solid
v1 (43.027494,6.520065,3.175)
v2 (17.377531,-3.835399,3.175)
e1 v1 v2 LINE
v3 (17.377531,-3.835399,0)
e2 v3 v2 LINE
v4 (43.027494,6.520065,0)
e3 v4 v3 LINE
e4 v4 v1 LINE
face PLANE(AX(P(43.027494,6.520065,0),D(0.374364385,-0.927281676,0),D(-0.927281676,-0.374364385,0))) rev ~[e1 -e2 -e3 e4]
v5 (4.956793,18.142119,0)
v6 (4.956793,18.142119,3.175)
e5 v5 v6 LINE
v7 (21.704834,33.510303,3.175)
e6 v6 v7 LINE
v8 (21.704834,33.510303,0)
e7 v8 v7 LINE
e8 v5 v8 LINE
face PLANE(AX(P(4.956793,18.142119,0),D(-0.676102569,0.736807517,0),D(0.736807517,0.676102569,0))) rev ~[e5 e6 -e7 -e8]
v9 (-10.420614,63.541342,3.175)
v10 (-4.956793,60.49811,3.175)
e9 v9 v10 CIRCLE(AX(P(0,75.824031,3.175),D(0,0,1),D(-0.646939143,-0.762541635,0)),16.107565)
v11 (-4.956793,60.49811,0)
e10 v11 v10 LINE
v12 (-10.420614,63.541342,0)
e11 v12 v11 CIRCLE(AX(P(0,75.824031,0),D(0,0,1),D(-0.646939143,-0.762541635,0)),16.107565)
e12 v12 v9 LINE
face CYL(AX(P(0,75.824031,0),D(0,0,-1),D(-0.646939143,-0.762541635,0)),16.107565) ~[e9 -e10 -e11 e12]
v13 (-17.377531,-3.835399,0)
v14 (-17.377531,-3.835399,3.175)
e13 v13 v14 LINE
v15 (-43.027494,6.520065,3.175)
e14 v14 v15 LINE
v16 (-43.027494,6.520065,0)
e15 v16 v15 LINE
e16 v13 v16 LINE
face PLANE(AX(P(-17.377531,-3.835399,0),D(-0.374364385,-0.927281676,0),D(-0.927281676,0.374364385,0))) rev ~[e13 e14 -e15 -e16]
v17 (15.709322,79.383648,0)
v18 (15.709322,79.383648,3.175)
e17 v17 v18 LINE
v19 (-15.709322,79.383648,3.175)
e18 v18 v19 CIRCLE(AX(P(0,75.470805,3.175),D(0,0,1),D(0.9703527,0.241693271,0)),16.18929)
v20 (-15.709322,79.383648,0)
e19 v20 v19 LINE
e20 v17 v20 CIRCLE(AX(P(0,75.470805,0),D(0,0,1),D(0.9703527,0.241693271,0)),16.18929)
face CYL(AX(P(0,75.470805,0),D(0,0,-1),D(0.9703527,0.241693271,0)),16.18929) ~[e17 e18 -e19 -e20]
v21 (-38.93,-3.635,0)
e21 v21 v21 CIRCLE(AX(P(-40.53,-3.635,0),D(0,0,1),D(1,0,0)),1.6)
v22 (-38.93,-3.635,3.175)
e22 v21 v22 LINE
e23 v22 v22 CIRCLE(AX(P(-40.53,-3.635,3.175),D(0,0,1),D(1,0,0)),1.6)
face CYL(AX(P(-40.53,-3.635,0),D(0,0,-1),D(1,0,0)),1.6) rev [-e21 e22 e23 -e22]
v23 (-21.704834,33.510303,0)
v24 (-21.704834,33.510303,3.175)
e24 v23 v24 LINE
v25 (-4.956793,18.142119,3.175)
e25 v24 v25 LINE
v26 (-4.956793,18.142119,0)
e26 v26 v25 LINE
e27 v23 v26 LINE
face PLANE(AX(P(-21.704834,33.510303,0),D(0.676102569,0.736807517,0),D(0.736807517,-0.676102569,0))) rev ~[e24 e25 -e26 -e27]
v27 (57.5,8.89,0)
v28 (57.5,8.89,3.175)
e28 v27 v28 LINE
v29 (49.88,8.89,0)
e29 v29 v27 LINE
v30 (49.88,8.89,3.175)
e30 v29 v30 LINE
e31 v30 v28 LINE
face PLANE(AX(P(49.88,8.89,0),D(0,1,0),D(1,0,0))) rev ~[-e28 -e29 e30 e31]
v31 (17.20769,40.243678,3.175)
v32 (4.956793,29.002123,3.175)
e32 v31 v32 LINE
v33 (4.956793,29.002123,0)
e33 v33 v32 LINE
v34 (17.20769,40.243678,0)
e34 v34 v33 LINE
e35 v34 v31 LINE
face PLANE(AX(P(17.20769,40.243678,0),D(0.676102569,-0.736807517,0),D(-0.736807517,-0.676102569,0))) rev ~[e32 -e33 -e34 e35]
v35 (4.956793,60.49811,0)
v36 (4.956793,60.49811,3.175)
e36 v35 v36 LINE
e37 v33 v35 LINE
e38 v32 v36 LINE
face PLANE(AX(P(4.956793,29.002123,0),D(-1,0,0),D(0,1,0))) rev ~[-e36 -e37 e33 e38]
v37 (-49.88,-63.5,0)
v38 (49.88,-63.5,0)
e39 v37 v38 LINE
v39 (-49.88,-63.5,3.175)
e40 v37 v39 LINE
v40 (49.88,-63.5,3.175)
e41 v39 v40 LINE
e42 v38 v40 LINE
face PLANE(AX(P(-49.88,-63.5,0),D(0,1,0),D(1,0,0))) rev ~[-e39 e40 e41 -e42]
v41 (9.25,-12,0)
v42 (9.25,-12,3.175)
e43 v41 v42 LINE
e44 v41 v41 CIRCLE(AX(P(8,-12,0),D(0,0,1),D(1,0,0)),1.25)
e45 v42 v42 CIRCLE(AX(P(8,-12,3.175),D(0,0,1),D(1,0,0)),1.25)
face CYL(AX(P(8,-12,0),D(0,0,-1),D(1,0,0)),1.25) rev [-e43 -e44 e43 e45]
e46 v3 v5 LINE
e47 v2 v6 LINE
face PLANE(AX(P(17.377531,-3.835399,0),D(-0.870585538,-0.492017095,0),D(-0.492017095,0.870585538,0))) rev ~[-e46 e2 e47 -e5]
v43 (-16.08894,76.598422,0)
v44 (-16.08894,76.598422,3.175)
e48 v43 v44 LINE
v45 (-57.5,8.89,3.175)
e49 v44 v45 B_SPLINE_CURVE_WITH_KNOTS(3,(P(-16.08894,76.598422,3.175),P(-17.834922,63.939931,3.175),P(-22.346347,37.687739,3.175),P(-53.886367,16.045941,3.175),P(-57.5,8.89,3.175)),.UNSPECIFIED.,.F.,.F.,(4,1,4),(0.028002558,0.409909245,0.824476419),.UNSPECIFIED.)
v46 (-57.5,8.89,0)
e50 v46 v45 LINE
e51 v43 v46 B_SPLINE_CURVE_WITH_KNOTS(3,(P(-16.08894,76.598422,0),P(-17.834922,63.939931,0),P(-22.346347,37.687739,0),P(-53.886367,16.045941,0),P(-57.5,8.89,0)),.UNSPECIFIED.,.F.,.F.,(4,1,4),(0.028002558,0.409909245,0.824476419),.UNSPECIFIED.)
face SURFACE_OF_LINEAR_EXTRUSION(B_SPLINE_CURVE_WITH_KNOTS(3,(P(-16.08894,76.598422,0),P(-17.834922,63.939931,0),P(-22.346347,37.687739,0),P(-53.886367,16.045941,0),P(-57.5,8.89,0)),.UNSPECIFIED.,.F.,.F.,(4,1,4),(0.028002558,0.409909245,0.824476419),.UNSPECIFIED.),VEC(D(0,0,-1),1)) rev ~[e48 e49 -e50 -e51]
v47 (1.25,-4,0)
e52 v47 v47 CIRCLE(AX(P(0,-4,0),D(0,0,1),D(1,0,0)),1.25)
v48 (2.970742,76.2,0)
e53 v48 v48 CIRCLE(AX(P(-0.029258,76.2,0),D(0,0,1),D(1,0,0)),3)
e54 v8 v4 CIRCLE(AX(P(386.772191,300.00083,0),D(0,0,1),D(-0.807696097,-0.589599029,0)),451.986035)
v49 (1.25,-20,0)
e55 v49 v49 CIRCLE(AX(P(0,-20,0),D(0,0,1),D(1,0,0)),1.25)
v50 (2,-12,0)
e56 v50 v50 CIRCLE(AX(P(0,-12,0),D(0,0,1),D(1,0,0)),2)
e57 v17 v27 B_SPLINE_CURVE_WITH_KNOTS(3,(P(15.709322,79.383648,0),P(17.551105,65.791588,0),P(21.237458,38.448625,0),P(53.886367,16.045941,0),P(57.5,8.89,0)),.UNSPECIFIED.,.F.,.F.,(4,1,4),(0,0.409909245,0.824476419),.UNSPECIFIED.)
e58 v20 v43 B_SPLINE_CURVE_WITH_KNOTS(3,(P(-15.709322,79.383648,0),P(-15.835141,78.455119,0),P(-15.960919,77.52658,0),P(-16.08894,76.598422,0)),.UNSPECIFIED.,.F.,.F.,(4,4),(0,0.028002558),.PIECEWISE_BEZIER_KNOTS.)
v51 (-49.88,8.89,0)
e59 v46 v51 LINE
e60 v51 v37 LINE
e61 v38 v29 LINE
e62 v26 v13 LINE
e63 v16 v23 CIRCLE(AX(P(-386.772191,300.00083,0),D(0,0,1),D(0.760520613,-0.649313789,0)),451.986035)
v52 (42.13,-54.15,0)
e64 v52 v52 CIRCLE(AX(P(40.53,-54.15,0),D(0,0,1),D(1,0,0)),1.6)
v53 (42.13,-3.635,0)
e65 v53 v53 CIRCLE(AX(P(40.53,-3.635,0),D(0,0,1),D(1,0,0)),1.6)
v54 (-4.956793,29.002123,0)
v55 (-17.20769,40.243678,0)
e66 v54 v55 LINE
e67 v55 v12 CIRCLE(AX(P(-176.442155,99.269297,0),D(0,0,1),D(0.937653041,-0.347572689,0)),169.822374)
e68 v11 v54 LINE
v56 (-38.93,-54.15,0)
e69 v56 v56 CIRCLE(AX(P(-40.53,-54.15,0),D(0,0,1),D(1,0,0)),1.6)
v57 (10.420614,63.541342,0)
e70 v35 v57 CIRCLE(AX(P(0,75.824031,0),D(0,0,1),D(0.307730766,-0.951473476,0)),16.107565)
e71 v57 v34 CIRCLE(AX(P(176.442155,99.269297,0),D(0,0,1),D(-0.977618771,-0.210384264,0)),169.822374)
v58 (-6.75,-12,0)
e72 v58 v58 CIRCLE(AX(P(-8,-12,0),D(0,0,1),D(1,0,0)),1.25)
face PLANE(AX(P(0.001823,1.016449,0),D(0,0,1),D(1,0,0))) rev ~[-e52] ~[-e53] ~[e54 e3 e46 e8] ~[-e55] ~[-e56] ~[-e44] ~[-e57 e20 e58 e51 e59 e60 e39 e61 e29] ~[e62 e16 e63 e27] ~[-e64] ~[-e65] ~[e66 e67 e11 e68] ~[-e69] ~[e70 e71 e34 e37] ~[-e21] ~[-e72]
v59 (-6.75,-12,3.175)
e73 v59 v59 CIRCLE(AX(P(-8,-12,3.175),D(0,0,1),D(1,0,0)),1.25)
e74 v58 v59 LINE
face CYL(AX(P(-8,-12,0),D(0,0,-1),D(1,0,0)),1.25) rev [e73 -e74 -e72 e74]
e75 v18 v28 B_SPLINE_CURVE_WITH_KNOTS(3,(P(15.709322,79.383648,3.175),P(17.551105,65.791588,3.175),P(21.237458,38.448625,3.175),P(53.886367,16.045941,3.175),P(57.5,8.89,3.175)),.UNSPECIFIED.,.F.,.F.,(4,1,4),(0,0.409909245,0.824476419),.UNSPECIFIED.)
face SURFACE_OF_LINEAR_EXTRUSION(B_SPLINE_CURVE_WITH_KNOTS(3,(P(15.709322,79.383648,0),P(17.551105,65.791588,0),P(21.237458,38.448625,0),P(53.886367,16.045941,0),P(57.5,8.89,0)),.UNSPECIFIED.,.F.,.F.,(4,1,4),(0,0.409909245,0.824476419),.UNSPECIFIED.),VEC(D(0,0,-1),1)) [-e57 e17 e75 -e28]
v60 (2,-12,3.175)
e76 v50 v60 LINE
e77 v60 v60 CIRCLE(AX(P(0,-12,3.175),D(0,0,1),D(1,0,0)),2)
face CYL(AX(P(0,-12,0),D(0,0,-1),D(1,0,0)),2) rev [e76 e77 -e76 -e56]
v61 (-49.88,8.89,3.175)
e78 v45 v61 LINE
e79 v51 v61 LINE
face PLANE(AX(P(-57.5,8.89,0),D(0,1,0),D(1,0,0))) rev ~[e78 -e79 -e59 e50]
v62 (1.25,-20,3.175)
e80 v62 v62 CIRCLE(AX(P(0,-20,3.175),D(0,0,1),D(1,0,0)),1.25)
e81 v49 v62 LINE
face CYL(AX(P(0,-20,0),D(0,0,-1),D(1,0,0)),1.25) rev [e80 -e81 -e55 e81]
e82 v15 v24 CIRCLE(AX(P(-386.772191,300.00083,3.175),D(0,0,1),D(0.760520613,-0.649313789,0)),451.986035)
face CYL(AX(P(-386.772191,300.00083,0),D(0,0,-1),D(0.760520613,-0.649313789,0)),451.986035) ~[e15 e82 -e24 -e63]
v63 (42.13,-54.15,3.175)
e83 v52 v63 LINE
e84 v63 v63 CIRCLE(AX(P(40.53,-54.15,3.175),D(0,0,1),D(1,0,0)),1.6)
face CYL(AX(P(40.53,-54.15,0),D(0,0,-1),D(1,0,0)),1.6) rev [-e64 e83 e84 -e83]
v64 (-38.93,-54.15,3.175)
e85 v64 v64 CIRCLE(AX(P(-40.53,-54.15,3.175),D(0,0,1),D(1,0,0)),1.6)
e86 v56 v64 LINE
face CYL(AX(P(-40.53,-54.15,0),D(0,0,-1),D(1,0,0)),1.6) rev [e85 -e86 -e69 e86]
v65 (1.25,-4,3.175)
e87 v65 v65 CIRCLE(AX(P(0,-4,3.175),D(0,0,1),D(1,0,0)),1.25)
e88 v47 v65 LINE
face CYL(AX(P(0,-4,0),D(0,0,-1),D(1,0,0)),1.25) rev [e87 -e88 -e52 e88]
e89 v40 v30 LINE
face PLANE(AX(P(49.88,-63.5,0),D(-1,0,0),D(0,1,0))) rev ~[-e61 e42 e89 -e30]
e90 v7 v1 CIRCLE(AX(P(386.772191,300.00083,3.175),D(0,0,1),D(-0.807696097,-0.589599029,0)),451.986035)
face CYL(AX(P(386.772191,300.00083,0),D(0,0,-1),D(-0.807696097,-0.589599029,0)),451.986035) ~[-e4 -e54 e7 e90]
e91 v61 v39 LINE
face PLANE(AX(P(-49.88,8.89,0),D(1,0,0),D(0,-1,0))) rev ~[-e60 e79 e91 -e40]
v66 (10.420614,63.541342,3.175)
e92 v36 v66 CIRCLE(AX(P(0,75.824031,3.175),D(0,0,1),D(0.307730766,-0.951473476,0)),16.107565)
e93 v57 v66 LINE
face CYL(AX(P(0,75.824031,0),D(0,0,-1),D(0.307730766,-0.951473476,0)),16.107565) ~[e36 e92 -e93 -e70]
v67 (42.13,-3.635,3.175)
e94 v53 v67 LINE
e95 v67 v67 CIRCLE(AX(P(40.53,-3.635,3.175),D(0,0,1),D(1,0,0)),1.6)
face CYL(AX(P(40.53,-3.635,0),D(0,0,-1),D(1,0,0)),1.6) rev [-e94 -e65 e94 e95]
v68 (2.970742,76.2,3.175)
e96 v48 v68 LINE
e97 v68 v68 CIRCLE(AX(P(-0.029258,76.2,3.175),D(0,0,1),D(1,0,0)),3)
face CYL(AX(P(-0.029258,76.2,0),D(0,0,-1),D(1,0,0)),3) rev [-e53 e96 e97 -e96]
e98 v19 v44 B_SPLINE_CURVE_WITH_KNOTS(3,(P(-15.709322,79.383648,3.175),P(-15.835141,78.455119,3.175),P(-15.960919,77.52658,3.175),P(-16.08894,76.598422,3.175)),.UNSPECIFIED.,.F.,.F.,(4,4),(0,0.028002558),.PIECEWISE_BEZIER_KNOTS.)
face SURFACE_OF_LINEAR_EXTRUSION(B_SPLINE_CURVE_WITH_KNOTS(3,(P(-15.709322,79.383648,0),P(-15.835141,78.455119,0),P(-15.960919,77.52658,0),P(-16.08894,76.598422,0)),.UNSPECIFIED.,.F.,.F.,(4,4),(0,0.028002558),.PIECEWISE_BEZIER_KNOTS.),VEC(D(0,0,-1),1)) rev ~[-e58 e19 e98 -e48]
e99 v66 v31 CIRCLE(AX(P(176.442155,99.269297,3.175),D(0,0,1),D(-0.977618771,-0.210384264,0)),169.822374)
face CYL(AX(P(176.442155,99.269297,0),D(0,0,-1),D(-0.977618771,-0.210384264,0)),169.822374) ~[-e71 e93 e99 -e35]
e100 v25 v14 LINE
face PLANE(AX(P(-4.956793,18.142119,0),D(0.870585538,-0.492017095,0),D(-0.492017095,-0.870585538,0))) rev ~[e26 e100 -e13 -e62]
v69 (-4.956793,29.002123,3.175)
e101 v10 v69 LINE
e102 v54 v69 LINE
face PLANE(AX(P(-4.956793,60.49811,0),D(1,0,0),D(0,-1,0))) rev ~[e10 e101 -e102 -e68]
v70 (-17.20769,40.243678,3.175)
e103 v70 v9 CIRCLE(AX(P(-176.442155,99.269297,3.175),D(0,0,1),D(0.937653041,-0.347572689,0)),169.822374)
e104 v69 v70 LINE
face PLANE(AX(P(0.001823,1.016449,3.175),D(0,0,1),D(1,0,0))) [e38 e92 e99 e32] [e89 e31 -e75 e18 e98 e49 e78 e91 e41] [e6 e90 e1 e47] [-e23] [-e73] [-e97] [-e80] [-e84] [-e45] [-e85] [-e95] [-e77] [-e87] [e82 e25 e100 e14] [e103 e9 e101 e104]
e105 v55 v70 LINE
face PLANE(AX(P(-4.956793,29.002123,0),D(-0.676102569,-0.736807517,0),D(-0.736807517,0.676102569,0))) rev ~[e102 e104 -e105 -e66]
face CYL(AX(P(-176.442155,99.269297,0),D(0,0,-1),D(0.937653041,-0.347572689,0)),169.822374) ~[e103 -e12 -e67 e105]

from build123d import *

# Parameters (mm, degrees)
F0_R     = 1.6
F0_R_2   = 1.25
F0_R_3   = 2
F0_R_4   = 3
F1_DEPTH = 3.175


# Not quite as in the source:
# - a feature names something its author has since deleted; it is built from what else it names


with BuildPart() as f1:
    # F0 (on Top) → F1 (new body)
    with BuildSketch(Plane.XY):
        with BuildLine():
            Line((-49.8799999985, 8.89), (-49.8799999985, -63.5))
            Line((-49.8799999985, -63.5), (49.8799999985, -63.5))
            Line((49.8799999985, -63.5), (49.8799999985, 8.89))
            Line((49.8799999985, 8.89), (57.4999999985, 8.89))
            add(Edge.make_bspline(
                [(15.7093216459, 79.3836478465), (17.5511050126, 65.7915878149), (21.2374579051, 38.4486252292), (53.8863670451, 16.0459412112), (57.4999999985, 8.89)],
                knots=[0, 0, 0, 0, 0.4099092451, 0.8244764195, 0.8244764195, 0.8244764195, 0.8244764195], degree=3))
            ThreePointArc((15.7093216459, 79.3836478465), (0, 91.6600956823), (-15.7093216459, 79.3836478465))
            add(Edge.make_bspline(
                [(-15.7093216459, 79.3836478465), (-15.8351413169, 78.4551192516), (-15.960918893, 77.5265804672), (-16.0889396188, 76.5984215036)],
                knots=[0, 0, 0, 0, 0.0280025584, 0.0280025584, 0.0280025584, 0.0280025584], degree=3))
            add(Edge.make_bspline(
                [(-16.0889396188, 76.5984215036), (-17.8349219122, 63.9399312026), (-22.3463470917, 37.6877393462), (-53.8863670451, 16.0459412112), (-57.4999999985, 8.89)],
                knots=[0.0280025584, 0.0280025584, 0.0280025584, 0.0280025584, 0.4099092451, 0.8244764195, 0.8244764195, 0.8244764195, 0.8244764195], degree=3))
            Line((-57.4999999985, 8.89), (-49.8799999985, 8.89))
        make_face()
        with Locations((-40.5299999985, -54.15)):
            Circle(F0_R, mode=Mode.SUBTRACT)
        with Locations((-40.5299999985, -3.635)):
            Circle(F0_R, mode=Mode.SUBTRACT)
        with Locations((-8, -12)):
            Circle(F0_R_2, mode=Mode.SUBTRACT)
        with Locations((40.5299999985, -54.15)):
            Circle(F0_R, mode=Mode.SUBTRACT)
        with Locations((0, -20)):
            Circle(F0_R_2, mode=Mode.SUBTRACT)
        with Locations((0, -12)):
            Circle(F0_R_3, mode=Mode.SUBTRACT)
        with Locations((8, -12)):
            Circle(F0_R_2, mode=Mode.SUBTRACT)
        with Locations((0, -4)):
            Circle(F0_R_2, mode=Mode.SUBTRACT)
        with Locations((40.5299999985, -3.635)):
            Circle(F0_R, mode=Mode.SUBTRACT)
        with BuildLine():
            Line((-21.7048343448, 33.51030308), (-4.9567933963, 18.14211905))
            Line((-4.9567933963, 18.14211905), (-17.3775311559, -3.8353991695))
            Line((-17.3775311559, -3.8353991695), (-43.0274941027, 6.520065479))
            ThreePointArc((-43.0274941027, 6.520065479), (-32.1093228463, 19.8122760508), (-21.7048343448, 33.51030308))
        make_face(mode=Mode.SUBTRACT)
        with BuildLine():
            ThreePointArc((-10.4206144746, 63.5413418448), (-7.8378238948, 61.7519957694), (-4.9567933963, 60.4981098798))
            Line((-4.9567933963, 60.4981098798), (-4.9567933963, 29.0021225758))
            Line((-4.9567933963, 29.0021225758), (-17.2076895833, 40.2436777949))
            ThreePointArc((-17.2076895833, 40.2436777949), (-13.397490451, 51.7711279758), (-10.4206144746, 63.5413418448))
        make_face(mode=Mode.SUBTRACT)
        with Locations((-0.0292583045, 76.2)):
            Circle(F0_R_4, mode=Mode.SUBTRACT)
        with BuildLine():
            Line((17.3775311559, -3.8353991695), (4.9567933963, 18.14211905))
            Line((4.9567933963, 18.14211905), (21.7048343448, 33.51030308))
            ThreePointArc((21.7048343448, 33.51030308), (32.1093228463, 19.8122760508), (43.0274941027, 6.520065479))
            Line((43.0274941027, 6.520065479), (17.3775311559, -3.8353991695))
        make_face(mode=Mode.SUBTRACT)
        with BuildLine():
            Line((17.2076895833, 40.2436777949), (4.9567933963, 29.0021225758))
            Line((4.9567933963, 29.0021225758), (4.9567933963, 60.4981098798))
            ThreePointArc((4.9567933963, 60.4981098798), (7.8378238948, 61.7519957694), (10.4206144746, 63.5413418448))
            ThreePointArc((10.4206144746, 63.5413418448), (13.397490451, 51.7711279758), (17.2076895833, 40.2436777949))
        make_face(mode=Mode.SUBTRACT)
    extrude(amount=F1_DEPTH)


solid = f1.part
